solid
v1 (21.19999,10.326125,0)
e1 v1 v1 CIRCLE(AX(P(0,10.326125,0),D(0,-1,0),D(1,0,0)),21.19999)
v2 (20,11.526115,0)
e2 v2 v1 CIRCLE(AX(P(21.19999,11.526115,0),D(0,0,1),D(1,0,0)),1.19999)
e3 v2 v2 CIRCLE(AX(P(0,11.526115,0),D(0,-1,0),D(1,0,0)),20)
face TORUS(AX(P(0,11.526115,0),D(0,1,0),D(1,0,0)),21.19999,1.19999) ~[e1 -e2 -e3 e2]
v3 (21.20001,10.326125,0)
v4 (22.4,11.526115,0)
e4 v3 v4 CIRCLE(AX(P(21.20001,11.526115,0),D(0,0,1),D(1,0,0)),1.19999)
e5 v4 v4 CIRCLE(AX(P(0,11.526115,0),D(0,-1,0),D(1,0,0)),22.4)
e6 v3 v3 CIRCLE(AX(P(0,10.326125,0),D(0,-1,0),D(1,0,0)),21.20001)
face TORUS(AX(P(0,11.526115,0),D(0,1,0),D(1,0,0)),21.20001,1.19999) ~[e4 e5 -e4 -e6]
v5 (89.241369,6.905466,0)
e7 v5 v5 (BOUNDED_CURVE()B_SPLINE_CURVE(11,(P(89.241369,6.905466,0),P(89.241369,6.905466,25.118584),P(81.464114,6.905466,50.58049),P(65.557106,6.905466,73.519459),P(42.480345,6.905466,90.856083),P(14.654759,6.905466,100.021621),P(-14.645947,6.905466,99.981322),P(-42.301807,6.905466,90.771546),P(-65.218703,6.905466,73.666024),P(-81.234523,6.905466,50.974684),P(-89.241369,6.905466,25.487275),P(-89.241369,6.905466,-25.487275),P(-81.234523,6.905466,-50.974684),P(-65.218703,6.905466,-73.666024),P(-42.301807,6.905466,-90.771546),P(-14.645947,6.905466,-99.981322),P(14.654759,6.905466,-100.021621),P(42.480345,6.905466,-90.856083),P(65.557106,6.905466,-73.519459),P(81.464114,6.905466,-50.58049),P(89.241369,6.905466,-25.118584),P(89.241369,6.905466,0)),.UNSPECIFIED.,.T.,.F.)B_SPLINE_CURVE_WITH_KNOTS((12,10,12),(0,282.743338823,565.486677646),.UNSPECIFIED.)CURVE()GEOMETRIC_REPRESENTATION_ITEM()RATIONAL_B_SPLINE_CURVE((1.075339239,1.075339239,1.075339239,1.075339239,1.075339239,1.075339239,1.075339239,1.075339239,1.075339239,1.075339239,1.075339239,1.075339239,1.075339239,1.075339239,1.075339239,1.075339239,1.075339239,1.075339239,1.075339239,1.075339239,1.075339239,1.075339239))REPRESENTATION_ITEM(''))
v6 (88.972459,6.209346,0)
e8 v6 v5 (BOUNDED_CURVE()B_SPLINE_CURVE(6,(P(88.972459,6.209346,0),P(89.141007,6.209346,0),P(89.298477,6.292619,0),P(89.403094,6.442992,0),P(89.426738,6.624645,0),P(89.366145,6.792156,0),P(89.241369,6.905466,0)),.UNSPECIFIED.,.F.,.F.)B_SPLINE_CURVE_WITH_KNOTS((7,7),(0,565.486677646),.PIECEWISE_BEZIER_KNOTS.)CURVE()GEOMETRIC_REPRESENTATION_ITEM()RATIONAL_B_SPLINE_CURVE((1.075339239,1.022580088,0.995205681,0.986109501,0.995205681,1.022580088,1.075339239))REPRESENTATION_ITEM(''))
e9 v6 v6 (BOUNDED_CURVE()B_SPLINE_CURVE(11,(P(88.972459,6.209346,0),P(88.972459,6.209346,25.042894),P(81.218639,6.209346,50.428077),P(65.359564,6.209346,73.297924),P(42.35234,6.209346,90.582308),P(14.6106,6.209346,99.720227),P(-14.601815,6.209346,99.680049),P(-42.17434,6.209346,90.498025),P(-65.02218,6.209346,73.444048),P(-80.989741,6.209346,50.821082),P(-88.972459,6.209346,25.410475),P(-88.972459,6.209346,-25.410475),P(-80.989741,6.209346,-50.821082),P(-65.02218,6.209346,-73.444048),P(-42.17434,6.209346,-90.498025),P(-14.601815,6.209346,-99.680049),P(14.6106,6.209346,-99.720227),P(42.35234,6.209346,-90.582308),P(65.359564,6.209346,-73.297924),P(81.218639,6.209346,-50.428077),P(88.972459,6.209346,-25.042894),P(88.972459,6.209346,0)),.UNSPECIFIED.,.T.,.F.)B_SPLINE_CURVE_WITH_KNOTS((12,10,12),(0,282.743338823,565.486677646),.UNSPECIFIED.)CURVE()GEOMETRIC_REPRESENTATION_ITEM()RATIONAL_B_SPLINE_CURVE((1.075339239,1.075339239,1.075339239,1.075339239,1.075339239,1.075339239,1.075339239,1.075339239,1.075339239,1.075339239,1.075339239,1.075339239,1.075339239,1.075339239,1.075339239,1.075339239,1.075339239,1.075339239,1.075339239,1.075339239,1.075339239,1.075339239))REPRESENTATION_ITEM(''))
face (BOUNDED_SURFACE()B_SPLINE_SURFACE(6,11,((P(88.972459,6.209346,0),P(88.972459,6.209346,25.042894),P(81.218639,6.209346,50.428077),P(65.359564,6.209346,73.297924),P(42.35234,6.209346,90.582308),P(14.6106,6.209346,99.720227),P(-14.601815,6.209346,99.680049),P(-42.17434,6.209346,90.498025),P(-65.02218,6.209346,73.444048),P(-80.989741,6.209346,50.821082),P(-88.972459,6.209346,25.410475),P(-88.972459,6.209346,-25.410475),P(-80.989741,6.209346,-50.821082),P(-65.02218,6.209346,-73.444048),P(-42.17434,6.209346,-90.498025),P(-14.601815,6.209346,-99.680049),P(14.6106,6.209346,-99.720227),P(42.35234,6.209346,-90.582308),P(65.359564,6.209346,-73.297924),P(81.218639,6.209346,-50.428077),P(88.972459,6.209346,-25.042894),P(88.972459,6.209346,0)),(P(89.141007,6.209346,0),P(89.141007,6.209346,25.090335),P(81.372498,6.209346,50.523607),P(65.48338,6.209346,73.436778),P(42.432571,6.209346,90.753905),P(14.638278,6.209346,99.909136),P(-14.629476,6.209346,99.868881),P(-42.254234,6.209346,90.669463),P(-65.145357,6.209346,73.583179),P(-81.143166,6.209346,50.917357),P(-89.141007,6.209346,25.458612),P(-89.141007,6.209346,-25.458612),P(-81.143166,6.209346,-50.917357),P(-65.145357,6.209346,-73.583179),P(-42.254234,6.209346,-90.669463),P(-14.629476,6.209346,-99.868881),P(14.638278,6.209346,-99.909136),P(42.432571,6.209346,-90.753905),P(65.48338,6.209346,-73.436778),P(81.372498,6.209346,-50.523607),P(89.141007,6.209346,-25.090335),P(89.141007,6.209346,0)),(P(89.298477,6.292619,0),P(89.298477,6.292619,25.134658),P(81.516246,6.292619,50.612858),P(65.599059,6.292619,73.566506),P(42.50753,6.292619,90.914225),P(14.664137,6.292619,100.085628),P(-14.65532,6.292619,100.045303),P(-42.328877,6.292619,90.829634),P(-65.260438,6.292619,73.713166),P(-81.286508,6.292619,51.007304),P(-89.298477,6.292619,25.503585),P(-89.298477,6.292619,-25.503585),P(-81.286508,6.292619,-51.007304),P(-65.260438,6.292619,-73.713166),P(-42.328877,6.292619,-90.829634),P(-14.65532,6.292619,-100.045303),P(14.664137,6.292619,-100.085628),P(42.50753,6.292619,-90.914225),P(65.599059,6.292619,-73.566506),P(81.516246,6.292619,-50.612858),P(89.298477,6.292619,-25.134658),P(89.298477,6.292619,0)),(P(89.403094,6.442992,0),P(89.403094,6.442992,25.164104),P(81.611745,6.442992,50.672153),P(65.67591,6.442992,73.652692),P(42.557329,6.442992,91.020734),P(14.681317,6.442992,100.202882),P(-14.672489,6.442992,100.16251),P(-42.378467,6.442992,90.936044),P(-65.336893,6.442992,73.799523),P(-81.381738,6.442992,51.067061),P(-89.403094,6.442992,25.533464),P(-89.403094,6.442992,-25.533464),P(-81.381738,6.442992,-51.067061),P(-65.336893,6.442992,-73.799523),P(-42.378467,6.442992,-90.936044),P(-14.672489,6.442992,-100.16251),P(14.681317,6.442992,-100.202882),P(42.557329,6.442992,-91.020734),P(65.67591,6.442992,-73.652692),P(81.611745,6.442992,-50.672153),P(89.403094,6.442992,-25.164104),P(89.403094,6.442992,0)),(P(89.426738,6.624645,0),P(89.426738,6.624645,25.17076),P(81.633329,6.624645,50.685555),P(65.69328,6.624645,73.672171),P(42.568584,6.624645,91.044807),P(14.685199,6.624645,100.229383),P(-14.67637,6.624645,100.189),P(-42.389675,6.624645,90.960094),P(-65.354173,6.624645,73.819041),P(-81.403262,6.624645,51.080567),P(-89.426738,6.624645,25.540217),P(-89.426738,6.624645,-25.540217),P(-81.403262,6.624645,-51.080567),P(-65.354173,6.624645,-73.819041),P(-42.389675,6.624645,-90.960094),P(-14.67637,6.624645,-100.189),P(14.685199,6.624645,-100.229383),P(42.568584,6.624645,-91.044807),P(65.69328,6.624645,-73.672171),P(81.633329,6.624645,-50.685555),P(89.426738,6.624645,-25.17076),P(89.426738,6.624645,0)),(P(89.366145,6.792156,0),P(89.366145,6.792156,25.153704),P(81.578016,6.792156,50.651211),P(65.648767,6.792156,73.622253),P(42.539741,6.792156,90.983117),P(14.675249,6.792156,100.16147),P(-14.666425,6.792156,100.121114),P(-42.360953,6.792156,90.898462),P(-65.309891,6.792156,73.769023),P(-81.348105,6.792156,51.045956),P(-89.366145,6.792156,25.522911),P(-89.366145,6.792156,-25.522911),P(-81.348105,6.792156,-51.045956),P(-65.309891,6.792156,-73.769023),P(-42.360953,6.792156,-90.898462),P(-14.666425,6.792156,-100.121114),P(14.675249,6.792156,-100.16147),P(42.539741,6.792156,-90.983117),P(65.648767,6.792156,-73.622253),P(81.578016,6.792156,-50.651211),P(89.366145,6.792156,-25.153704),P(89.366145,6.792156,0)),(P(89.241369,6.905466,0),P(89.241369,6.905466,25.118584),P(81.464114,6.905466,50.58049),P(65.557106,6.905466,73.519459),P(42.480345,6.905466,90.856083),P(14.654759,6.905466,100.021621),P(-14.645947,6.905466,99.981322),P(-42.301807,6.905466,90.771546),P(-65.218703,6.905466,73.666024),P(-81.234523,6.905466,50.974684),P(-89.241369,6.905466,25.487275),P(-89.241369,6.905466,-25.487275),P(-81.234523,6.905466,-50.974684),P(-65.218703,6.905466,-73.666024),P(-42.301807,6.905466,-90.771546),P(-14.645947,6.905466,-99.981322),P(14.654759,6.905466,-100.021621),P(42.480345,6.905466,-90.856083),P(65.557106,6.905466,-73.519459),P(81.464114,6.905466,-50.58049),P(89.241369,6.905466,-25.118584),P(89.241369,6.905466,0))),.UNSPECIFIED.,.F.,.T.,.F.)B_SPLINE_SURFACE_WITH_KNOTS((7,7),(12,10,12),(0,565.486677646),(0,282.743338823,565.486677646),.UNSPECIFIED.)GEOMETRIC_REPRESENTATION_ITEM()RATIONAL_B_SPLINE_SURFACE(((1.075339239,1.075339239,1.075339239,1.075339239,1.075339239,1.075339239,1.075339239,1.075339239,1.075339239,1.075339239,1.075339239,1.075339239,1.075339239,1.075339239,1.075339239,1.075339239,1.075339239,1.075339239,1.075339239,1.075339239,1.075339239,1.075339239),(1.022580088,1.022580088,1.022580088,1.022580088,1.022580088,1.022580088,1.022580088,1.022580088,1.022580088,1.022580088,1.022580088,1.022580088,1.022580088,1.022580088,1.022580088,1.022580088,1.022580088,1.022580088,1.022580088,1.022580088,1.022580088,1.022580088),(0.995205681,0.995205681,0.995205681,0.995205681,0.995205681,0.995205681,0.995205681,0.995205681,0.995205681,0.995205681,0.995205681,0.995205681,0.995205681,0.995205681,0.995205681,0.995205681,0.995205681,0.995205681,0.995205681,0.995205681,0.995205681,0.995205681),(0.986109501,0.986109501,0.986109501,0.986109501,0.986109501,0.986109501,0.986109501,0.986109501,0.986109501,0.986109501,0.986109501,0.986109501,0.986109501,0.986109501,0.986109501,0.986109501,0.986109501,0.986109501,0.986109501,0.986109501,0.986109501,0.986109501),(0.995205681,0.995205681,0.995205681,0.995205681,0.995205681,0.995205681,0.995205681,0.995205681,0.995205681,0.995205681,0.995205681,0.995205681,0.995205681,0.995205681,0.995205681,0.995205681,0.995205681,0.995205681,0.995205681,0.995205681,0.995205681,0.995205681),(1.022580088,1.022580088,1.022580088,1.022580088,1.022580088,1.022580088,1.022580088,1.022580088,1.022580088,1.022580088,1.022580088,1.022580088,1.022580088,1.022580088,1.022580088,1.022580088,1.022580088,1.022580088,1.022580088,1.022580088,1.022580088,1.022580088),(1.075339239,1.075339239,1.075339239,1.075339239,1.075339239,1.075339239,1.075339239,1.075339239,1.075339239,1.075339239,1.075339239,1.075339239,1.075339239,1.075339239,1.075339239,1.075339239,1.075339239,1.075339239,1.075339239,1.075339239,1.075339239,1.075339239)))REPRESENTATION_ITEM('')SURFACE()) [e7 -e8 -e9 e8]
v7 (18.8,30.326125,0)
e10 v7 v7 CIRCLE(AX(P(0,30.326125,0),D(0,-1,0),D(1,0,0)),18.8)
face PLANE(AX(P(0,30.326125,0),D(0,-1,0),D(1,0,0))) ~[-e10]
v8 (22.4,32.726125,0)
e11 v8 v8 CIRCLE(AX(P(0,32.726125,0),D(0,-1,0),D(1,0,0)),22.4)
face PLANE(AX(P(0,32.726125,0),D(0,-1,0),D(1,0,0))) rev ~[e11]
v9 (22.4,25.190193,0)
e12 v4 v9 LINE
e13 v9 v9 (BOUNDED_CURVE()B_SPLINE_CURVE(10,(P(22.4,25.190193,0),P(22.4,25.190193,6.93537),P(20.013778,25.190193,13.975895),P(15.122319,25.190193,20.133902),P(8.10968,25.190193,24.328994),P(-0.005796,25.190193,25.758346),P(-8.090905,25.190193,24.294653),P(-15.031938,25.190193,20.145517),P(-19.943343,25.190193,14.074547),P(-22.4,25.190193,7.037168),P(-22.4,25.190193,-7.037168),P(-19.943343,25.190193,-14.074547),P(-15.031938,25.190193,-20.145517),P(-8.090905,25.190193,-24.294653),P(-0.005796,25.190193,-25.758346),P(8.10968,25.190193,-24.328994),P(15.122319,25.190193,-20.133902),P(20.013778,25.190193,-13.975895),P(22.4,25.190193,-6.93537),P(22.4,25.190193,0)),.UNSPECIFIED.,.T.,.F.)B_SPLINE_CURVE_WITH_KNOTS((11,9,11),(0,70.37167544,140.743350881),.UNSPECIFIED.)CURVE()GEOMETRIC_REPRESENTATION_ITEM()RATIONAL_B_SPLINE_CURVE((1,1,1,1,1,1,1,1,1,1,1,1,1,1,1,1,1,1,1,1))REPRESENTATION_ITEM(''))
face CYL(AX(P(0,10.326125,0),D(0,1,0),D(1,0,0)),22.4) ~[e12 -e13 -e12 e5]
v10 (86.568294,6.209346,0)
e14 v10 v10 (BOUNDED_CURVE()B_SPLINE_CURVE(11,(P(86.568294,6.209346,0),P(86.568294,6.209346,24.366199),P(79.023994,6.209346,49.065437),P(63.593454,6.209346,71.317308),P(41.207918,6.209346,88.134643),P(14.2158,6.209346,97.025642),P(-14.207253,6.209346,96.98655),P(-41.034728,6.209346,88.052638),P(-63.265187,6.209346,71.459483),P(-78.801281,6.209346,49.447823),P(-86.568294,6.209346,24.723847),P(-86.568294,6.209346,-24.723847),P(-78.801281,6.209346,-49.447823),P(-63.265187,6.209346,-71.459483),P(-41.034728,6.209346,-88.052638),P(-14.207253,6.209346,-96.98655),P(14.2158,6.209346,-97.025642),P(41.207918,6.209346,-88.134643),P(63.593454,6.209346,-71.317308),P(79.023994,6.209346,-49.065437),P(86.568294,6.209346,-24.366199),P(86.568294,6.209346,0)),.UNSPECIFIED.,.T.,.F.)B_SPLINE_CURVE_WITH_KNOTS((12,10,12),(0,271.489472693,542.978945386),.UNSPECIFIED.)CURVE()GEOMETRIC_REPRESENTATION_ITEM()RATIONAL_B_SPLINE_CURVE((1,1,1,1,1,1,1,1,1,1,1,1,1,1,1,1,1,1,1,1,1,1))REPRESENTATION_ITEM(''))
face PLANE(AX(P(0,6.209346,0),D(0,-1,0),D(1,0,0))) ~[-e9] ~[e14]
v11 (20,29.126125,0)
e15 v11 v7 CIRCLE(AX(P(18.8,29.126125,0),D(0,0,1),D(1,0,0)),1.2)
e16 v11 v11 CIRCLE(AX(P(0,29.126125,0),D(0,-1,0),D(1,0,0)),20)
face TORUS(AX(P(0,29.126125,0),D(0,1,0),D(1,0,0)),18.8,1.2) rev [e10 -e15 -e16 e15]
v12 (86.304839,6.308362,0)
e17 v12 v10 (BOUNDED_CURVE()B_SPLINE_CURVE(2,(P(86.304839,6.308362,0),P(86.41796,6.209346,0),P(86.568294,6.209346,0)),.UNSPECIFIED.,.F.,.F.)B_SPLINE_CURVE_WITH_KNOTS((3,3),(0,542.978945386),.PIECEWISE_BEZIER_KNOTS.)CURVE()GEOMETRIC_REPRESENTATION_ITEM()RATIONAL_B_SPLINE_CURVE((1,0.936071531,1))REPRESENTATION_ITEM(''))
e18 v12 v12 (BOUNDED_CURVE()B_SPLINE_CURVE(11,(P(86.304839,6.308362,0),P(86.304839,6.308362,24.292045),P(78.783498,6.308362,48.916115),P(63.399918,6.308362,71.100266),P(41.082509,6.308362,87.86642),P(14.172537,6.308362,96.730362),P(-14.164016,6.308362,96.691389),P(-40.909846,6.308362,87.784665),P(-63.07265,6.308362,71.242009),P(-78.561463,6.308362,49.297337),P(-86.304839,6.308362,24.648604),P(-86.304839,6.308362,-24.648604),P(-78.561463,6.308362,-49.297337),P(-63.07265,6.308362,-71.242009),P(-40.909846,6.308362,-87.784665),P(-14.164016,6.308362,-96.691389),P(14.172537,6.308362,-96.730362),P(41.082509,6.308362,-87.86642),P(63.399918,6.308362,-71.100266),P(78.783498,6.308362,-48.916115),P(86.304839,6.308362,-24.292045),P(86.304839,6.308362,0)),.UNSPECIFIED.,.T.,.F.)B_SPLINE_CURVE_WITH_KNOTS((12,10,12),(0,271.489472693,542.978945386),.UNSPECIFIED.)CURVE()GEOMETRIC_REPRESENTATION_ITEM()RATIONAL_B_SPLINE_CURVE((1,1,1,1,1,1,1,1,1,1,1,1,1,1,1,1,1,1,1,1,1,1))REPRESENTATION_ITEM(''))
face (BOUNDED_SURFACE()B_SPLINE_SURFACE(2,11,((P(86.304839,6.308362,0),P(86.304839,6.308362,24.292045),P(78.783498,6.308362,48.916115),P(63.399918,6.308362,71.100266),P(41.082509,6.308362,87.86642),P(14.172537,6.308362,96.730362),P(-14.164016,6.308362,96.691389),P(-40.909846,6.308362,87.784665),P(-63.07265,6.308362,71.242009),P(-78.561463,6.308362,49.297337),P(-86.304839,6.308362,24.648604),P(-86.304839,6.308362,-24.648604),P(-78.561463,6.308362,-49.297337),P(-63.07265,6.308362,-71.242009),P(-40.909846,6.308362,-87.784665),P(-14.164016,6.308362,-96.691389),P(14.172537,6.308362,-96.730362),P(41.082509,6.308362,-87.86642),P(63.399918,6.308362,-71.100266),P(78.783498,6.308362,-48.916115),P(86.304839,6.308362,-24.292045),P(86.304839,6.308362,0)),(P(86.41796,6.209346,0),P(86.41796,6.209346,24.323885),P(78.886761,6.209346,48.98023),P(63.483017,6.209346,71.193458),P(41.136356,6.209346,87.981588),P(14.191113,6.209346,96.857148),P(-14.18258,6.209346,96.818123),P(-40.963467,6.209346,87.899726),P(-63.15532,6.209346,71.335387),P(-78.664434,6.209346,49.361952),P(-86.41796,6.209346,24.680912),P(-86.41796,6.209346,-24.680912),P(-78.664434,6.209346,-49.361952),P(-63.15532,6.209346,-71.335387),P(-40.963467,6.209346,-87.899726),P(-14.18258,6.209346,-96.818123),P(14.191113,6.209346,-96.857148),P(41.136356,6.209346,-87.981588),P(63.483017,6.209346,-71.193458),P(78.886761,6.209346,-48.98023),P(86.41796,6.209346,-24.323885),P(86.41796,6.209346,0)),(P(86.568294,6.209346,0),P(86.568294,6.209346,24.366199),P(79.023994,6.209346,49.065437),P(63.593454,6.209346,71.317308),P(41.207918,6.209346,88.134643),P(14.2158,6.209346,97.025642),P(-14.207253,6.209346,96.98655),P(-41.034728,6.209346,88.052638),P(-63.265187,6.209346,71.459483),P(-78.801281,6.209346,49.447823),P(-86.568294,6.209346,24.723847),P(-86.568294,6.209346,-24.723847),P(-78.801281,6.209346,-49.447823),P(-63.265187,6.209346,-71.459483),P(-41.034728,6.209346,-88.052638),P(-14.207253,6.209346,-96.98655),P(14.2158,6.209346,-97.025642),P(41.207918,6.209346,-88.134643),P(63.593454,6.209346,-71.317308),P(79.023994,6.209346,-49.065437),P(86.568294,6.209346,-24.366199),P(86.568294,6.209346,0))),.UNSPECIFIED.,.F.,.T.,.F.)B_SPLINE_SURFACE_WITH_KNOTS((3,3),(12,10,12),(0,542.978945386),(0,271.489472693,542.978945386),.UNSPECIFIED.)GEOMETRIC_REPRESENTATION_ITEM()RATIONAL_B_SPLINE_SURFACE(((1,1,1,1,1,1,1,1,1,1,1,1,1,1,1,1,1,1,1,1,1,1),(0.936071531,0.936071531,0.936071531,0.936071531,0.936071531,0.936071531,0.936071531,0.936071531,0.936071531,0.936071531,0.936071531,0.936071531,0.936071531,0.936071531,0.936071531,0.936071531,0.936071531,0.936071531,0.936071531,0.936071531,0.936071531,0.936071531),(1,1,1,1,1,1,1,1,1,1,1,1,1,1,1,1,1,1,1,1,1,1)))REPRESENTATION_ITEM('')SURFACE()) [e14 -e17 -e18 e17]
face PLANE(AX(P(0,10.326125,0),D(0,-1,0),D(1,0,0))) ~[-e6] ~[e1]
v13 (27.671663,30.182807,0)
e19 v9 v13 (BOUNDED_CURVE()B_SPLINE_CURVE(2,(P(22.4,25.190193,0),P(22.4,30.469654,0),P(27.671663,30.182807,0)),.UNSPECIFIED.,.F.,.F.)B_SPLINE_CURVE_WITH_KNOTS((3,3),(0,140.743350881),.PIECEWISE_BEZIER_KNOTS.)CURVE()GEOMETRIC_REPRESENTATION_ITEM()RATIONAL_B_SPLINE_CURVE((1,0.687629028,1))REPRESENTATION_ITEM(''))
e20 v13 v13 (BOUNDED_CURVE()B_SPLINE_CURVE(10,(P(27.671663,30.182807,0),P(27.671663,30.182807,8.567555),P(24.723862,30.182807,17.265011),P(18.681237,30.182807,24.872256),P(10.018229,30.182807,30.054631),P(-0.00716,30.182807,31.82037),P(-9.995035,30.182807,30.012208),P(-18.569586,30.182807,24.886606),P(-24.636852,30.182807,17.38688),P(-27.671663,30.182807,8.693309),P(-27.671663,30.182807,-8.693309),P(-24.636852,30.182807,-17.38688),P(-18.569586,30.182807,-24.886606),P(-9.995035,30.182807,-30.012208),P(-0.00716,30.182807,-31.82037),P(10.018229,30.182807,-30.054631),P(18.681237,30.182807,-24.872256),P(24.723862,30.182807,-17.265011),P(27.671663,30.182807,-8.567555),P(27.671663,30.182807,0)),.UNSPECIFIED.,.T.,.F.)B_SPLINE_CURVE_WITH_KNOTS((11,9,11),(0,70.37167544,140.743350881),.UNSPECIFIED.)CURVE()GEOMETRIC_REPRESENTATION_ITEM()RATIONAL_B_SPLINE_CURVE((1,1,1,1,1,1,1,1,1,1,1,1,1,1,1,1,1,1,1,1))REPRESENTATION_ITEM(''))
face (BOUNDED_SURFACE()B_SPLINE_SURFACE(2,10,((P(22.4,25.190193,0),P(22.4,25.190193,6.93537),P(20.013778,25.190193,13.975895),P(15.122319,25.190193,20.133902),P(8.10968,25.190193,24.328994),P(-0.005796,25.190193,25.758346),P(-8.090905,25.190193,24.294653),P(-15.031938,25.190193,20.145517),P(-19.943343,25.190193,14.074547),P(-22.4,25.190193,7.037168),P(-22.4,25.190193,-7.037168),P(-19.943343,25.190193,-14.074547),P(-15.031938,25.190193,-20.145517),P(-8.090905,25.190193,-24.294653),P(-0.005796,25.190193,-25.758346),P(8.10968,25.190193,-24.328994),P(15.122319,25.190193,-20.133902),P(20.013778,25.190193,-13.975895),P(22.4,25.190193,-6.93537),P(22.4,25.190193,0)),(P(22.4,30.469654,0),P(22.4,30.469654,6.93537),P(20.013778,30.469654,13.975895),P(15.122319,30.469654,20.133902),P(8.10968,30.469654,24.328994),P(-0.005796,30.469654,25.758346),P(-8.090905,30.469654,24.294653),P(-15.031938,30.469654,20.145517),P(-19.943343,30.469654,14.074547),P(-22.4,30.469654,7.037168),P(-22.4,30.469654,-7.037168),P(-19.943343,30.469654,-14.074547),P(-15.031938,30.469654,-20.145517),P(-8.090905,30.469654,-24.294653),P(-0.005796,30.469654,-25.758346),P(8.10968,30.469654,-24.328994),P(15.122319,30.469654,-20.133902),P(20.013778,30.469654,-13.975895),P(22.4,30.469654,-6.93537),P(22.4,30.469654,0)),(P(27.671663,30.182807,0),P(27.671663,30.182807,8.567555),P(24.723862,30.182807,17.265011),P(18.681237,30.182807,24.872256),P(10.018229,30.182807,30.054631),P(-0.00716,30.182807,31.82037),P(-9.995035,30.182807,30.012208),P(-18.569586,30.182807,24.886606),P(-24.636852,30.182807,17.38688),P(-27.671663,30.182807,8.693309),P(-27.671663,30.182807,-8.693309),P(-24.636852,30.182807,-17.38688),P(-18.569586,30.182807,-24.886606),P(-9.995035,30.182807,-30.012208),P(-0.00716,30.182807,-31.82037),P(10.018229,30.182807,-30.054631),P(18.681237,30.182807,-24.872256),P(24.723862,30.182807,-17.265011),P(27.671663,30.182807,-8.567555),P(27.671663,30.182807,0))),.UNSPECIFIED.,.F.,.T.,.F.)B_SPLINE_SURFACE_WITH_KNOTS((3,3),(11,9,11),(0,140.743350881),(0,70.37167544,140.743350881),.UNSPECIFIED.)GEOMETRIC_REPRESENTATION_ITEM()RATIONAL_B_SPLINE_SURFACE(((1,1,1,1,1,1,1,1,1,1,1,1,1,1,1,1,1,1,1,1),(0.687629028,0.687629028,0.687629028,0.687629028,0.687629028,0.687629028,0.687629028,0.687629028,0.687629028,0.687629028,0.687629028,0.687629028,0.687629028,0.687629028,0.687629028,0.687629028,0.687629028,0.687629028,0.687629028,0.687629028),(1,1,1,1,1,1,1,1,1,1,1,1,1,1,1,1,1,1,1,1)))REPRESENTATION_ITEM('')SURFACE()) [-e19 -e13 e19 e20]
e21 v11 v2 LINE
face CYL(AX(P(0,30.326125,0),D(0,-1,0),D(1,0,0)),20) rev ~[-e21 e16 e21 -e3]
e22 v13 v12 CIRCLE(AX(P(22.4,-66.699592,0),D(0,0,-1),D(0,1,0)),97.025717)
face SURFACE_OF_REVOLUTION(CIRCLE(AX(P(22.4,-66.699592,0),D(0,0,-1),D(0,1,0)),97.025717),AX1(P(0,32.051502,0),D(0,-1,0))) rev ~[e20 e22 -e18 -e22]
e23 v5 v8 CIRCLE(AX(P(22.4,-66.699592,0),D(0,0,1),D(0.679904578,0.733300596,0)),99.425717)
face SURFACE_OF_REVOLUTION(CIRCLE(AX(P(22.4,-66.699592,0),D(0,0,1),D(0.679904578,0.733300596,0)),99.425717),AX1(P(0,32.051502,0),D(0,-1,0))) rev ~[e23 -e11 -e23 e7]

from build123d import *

# Parameters (mm, degrees)
F2_R = 5
F3_R = 1.2
F4_R = 1.19999
F5_R = 0.4


# Not quite as in the source:
# - a fillet or chamfer is up to 0.001 mm smaller than in the source, because OpenCascade refuses the exact size


with BuildPart() as f1:
    # F0 (on Top) → F1 (revolve)
    with BuildSketch(Plane.XY):
        with BuildLine():
            Line((22.4, 32.7261249118), (0, 32.7261249118))
            Line((0, 32.7261249118), (0, 30.3261249118))
            Line((0, 30.3261249118), (20, 30.3261249118))
            Line((20, 30.3261249118), (20, 10.3261249118))
            Line((20, 10.3261249118), (22.4, 10.3261249118))
            Line((22.4, 10.3261249118), (22.4, 30.3261249118))
            ThreePointArc((22.4, 30.3261249118), (56.6048812575, 24.0969709185), (86.417783153, 6.2093455344))
            Line((86.417783153, 6.2093455344), (90, 6.2093455344))
            ThreePointArc((90, 6.2093455344), (58.7073669816, 25.8598390885), (22.4, 32.7261249118))
        make_face()
    revolve(axis=Axis((0, 32.0515017956, 0), (0, -1, 0)))

    # F2
    f2_edges = [f1.edges().sort_by_distance(p)[0] for p in [
        (-22.4, 30.326125, 0),
    ]]
    fillet(f2_edges, radius=F2_R)

    # F3
    f3_edges = [f1.edges().sort_by_distance(p)[0] for p in [
        (-20, 30.326125, 0),
    ]]
    fillet(f3_edges, radius=F3_R)

    # F4 (radius 1.2 in the source; OpenCascade refuses exactly that, so slightly less here)
    f4_edges = [f1.edges().sort_by_distance(p)[0] for p in [
        (-20, 10.326125, 0),
        (-22.4, 10.326125, 0),
    ]]
    fillet(f4_edges, radius=F4_R)

    # F5
    f5_edges = [f1.edges().sort_by_distance(p)[0] for p in [
        (-90, 6.209346, 0),
        (-86.417783, 6.209346, 0),
    ]]
    fillet(f5_edges, radius=F5_R)


solid = f1.part
